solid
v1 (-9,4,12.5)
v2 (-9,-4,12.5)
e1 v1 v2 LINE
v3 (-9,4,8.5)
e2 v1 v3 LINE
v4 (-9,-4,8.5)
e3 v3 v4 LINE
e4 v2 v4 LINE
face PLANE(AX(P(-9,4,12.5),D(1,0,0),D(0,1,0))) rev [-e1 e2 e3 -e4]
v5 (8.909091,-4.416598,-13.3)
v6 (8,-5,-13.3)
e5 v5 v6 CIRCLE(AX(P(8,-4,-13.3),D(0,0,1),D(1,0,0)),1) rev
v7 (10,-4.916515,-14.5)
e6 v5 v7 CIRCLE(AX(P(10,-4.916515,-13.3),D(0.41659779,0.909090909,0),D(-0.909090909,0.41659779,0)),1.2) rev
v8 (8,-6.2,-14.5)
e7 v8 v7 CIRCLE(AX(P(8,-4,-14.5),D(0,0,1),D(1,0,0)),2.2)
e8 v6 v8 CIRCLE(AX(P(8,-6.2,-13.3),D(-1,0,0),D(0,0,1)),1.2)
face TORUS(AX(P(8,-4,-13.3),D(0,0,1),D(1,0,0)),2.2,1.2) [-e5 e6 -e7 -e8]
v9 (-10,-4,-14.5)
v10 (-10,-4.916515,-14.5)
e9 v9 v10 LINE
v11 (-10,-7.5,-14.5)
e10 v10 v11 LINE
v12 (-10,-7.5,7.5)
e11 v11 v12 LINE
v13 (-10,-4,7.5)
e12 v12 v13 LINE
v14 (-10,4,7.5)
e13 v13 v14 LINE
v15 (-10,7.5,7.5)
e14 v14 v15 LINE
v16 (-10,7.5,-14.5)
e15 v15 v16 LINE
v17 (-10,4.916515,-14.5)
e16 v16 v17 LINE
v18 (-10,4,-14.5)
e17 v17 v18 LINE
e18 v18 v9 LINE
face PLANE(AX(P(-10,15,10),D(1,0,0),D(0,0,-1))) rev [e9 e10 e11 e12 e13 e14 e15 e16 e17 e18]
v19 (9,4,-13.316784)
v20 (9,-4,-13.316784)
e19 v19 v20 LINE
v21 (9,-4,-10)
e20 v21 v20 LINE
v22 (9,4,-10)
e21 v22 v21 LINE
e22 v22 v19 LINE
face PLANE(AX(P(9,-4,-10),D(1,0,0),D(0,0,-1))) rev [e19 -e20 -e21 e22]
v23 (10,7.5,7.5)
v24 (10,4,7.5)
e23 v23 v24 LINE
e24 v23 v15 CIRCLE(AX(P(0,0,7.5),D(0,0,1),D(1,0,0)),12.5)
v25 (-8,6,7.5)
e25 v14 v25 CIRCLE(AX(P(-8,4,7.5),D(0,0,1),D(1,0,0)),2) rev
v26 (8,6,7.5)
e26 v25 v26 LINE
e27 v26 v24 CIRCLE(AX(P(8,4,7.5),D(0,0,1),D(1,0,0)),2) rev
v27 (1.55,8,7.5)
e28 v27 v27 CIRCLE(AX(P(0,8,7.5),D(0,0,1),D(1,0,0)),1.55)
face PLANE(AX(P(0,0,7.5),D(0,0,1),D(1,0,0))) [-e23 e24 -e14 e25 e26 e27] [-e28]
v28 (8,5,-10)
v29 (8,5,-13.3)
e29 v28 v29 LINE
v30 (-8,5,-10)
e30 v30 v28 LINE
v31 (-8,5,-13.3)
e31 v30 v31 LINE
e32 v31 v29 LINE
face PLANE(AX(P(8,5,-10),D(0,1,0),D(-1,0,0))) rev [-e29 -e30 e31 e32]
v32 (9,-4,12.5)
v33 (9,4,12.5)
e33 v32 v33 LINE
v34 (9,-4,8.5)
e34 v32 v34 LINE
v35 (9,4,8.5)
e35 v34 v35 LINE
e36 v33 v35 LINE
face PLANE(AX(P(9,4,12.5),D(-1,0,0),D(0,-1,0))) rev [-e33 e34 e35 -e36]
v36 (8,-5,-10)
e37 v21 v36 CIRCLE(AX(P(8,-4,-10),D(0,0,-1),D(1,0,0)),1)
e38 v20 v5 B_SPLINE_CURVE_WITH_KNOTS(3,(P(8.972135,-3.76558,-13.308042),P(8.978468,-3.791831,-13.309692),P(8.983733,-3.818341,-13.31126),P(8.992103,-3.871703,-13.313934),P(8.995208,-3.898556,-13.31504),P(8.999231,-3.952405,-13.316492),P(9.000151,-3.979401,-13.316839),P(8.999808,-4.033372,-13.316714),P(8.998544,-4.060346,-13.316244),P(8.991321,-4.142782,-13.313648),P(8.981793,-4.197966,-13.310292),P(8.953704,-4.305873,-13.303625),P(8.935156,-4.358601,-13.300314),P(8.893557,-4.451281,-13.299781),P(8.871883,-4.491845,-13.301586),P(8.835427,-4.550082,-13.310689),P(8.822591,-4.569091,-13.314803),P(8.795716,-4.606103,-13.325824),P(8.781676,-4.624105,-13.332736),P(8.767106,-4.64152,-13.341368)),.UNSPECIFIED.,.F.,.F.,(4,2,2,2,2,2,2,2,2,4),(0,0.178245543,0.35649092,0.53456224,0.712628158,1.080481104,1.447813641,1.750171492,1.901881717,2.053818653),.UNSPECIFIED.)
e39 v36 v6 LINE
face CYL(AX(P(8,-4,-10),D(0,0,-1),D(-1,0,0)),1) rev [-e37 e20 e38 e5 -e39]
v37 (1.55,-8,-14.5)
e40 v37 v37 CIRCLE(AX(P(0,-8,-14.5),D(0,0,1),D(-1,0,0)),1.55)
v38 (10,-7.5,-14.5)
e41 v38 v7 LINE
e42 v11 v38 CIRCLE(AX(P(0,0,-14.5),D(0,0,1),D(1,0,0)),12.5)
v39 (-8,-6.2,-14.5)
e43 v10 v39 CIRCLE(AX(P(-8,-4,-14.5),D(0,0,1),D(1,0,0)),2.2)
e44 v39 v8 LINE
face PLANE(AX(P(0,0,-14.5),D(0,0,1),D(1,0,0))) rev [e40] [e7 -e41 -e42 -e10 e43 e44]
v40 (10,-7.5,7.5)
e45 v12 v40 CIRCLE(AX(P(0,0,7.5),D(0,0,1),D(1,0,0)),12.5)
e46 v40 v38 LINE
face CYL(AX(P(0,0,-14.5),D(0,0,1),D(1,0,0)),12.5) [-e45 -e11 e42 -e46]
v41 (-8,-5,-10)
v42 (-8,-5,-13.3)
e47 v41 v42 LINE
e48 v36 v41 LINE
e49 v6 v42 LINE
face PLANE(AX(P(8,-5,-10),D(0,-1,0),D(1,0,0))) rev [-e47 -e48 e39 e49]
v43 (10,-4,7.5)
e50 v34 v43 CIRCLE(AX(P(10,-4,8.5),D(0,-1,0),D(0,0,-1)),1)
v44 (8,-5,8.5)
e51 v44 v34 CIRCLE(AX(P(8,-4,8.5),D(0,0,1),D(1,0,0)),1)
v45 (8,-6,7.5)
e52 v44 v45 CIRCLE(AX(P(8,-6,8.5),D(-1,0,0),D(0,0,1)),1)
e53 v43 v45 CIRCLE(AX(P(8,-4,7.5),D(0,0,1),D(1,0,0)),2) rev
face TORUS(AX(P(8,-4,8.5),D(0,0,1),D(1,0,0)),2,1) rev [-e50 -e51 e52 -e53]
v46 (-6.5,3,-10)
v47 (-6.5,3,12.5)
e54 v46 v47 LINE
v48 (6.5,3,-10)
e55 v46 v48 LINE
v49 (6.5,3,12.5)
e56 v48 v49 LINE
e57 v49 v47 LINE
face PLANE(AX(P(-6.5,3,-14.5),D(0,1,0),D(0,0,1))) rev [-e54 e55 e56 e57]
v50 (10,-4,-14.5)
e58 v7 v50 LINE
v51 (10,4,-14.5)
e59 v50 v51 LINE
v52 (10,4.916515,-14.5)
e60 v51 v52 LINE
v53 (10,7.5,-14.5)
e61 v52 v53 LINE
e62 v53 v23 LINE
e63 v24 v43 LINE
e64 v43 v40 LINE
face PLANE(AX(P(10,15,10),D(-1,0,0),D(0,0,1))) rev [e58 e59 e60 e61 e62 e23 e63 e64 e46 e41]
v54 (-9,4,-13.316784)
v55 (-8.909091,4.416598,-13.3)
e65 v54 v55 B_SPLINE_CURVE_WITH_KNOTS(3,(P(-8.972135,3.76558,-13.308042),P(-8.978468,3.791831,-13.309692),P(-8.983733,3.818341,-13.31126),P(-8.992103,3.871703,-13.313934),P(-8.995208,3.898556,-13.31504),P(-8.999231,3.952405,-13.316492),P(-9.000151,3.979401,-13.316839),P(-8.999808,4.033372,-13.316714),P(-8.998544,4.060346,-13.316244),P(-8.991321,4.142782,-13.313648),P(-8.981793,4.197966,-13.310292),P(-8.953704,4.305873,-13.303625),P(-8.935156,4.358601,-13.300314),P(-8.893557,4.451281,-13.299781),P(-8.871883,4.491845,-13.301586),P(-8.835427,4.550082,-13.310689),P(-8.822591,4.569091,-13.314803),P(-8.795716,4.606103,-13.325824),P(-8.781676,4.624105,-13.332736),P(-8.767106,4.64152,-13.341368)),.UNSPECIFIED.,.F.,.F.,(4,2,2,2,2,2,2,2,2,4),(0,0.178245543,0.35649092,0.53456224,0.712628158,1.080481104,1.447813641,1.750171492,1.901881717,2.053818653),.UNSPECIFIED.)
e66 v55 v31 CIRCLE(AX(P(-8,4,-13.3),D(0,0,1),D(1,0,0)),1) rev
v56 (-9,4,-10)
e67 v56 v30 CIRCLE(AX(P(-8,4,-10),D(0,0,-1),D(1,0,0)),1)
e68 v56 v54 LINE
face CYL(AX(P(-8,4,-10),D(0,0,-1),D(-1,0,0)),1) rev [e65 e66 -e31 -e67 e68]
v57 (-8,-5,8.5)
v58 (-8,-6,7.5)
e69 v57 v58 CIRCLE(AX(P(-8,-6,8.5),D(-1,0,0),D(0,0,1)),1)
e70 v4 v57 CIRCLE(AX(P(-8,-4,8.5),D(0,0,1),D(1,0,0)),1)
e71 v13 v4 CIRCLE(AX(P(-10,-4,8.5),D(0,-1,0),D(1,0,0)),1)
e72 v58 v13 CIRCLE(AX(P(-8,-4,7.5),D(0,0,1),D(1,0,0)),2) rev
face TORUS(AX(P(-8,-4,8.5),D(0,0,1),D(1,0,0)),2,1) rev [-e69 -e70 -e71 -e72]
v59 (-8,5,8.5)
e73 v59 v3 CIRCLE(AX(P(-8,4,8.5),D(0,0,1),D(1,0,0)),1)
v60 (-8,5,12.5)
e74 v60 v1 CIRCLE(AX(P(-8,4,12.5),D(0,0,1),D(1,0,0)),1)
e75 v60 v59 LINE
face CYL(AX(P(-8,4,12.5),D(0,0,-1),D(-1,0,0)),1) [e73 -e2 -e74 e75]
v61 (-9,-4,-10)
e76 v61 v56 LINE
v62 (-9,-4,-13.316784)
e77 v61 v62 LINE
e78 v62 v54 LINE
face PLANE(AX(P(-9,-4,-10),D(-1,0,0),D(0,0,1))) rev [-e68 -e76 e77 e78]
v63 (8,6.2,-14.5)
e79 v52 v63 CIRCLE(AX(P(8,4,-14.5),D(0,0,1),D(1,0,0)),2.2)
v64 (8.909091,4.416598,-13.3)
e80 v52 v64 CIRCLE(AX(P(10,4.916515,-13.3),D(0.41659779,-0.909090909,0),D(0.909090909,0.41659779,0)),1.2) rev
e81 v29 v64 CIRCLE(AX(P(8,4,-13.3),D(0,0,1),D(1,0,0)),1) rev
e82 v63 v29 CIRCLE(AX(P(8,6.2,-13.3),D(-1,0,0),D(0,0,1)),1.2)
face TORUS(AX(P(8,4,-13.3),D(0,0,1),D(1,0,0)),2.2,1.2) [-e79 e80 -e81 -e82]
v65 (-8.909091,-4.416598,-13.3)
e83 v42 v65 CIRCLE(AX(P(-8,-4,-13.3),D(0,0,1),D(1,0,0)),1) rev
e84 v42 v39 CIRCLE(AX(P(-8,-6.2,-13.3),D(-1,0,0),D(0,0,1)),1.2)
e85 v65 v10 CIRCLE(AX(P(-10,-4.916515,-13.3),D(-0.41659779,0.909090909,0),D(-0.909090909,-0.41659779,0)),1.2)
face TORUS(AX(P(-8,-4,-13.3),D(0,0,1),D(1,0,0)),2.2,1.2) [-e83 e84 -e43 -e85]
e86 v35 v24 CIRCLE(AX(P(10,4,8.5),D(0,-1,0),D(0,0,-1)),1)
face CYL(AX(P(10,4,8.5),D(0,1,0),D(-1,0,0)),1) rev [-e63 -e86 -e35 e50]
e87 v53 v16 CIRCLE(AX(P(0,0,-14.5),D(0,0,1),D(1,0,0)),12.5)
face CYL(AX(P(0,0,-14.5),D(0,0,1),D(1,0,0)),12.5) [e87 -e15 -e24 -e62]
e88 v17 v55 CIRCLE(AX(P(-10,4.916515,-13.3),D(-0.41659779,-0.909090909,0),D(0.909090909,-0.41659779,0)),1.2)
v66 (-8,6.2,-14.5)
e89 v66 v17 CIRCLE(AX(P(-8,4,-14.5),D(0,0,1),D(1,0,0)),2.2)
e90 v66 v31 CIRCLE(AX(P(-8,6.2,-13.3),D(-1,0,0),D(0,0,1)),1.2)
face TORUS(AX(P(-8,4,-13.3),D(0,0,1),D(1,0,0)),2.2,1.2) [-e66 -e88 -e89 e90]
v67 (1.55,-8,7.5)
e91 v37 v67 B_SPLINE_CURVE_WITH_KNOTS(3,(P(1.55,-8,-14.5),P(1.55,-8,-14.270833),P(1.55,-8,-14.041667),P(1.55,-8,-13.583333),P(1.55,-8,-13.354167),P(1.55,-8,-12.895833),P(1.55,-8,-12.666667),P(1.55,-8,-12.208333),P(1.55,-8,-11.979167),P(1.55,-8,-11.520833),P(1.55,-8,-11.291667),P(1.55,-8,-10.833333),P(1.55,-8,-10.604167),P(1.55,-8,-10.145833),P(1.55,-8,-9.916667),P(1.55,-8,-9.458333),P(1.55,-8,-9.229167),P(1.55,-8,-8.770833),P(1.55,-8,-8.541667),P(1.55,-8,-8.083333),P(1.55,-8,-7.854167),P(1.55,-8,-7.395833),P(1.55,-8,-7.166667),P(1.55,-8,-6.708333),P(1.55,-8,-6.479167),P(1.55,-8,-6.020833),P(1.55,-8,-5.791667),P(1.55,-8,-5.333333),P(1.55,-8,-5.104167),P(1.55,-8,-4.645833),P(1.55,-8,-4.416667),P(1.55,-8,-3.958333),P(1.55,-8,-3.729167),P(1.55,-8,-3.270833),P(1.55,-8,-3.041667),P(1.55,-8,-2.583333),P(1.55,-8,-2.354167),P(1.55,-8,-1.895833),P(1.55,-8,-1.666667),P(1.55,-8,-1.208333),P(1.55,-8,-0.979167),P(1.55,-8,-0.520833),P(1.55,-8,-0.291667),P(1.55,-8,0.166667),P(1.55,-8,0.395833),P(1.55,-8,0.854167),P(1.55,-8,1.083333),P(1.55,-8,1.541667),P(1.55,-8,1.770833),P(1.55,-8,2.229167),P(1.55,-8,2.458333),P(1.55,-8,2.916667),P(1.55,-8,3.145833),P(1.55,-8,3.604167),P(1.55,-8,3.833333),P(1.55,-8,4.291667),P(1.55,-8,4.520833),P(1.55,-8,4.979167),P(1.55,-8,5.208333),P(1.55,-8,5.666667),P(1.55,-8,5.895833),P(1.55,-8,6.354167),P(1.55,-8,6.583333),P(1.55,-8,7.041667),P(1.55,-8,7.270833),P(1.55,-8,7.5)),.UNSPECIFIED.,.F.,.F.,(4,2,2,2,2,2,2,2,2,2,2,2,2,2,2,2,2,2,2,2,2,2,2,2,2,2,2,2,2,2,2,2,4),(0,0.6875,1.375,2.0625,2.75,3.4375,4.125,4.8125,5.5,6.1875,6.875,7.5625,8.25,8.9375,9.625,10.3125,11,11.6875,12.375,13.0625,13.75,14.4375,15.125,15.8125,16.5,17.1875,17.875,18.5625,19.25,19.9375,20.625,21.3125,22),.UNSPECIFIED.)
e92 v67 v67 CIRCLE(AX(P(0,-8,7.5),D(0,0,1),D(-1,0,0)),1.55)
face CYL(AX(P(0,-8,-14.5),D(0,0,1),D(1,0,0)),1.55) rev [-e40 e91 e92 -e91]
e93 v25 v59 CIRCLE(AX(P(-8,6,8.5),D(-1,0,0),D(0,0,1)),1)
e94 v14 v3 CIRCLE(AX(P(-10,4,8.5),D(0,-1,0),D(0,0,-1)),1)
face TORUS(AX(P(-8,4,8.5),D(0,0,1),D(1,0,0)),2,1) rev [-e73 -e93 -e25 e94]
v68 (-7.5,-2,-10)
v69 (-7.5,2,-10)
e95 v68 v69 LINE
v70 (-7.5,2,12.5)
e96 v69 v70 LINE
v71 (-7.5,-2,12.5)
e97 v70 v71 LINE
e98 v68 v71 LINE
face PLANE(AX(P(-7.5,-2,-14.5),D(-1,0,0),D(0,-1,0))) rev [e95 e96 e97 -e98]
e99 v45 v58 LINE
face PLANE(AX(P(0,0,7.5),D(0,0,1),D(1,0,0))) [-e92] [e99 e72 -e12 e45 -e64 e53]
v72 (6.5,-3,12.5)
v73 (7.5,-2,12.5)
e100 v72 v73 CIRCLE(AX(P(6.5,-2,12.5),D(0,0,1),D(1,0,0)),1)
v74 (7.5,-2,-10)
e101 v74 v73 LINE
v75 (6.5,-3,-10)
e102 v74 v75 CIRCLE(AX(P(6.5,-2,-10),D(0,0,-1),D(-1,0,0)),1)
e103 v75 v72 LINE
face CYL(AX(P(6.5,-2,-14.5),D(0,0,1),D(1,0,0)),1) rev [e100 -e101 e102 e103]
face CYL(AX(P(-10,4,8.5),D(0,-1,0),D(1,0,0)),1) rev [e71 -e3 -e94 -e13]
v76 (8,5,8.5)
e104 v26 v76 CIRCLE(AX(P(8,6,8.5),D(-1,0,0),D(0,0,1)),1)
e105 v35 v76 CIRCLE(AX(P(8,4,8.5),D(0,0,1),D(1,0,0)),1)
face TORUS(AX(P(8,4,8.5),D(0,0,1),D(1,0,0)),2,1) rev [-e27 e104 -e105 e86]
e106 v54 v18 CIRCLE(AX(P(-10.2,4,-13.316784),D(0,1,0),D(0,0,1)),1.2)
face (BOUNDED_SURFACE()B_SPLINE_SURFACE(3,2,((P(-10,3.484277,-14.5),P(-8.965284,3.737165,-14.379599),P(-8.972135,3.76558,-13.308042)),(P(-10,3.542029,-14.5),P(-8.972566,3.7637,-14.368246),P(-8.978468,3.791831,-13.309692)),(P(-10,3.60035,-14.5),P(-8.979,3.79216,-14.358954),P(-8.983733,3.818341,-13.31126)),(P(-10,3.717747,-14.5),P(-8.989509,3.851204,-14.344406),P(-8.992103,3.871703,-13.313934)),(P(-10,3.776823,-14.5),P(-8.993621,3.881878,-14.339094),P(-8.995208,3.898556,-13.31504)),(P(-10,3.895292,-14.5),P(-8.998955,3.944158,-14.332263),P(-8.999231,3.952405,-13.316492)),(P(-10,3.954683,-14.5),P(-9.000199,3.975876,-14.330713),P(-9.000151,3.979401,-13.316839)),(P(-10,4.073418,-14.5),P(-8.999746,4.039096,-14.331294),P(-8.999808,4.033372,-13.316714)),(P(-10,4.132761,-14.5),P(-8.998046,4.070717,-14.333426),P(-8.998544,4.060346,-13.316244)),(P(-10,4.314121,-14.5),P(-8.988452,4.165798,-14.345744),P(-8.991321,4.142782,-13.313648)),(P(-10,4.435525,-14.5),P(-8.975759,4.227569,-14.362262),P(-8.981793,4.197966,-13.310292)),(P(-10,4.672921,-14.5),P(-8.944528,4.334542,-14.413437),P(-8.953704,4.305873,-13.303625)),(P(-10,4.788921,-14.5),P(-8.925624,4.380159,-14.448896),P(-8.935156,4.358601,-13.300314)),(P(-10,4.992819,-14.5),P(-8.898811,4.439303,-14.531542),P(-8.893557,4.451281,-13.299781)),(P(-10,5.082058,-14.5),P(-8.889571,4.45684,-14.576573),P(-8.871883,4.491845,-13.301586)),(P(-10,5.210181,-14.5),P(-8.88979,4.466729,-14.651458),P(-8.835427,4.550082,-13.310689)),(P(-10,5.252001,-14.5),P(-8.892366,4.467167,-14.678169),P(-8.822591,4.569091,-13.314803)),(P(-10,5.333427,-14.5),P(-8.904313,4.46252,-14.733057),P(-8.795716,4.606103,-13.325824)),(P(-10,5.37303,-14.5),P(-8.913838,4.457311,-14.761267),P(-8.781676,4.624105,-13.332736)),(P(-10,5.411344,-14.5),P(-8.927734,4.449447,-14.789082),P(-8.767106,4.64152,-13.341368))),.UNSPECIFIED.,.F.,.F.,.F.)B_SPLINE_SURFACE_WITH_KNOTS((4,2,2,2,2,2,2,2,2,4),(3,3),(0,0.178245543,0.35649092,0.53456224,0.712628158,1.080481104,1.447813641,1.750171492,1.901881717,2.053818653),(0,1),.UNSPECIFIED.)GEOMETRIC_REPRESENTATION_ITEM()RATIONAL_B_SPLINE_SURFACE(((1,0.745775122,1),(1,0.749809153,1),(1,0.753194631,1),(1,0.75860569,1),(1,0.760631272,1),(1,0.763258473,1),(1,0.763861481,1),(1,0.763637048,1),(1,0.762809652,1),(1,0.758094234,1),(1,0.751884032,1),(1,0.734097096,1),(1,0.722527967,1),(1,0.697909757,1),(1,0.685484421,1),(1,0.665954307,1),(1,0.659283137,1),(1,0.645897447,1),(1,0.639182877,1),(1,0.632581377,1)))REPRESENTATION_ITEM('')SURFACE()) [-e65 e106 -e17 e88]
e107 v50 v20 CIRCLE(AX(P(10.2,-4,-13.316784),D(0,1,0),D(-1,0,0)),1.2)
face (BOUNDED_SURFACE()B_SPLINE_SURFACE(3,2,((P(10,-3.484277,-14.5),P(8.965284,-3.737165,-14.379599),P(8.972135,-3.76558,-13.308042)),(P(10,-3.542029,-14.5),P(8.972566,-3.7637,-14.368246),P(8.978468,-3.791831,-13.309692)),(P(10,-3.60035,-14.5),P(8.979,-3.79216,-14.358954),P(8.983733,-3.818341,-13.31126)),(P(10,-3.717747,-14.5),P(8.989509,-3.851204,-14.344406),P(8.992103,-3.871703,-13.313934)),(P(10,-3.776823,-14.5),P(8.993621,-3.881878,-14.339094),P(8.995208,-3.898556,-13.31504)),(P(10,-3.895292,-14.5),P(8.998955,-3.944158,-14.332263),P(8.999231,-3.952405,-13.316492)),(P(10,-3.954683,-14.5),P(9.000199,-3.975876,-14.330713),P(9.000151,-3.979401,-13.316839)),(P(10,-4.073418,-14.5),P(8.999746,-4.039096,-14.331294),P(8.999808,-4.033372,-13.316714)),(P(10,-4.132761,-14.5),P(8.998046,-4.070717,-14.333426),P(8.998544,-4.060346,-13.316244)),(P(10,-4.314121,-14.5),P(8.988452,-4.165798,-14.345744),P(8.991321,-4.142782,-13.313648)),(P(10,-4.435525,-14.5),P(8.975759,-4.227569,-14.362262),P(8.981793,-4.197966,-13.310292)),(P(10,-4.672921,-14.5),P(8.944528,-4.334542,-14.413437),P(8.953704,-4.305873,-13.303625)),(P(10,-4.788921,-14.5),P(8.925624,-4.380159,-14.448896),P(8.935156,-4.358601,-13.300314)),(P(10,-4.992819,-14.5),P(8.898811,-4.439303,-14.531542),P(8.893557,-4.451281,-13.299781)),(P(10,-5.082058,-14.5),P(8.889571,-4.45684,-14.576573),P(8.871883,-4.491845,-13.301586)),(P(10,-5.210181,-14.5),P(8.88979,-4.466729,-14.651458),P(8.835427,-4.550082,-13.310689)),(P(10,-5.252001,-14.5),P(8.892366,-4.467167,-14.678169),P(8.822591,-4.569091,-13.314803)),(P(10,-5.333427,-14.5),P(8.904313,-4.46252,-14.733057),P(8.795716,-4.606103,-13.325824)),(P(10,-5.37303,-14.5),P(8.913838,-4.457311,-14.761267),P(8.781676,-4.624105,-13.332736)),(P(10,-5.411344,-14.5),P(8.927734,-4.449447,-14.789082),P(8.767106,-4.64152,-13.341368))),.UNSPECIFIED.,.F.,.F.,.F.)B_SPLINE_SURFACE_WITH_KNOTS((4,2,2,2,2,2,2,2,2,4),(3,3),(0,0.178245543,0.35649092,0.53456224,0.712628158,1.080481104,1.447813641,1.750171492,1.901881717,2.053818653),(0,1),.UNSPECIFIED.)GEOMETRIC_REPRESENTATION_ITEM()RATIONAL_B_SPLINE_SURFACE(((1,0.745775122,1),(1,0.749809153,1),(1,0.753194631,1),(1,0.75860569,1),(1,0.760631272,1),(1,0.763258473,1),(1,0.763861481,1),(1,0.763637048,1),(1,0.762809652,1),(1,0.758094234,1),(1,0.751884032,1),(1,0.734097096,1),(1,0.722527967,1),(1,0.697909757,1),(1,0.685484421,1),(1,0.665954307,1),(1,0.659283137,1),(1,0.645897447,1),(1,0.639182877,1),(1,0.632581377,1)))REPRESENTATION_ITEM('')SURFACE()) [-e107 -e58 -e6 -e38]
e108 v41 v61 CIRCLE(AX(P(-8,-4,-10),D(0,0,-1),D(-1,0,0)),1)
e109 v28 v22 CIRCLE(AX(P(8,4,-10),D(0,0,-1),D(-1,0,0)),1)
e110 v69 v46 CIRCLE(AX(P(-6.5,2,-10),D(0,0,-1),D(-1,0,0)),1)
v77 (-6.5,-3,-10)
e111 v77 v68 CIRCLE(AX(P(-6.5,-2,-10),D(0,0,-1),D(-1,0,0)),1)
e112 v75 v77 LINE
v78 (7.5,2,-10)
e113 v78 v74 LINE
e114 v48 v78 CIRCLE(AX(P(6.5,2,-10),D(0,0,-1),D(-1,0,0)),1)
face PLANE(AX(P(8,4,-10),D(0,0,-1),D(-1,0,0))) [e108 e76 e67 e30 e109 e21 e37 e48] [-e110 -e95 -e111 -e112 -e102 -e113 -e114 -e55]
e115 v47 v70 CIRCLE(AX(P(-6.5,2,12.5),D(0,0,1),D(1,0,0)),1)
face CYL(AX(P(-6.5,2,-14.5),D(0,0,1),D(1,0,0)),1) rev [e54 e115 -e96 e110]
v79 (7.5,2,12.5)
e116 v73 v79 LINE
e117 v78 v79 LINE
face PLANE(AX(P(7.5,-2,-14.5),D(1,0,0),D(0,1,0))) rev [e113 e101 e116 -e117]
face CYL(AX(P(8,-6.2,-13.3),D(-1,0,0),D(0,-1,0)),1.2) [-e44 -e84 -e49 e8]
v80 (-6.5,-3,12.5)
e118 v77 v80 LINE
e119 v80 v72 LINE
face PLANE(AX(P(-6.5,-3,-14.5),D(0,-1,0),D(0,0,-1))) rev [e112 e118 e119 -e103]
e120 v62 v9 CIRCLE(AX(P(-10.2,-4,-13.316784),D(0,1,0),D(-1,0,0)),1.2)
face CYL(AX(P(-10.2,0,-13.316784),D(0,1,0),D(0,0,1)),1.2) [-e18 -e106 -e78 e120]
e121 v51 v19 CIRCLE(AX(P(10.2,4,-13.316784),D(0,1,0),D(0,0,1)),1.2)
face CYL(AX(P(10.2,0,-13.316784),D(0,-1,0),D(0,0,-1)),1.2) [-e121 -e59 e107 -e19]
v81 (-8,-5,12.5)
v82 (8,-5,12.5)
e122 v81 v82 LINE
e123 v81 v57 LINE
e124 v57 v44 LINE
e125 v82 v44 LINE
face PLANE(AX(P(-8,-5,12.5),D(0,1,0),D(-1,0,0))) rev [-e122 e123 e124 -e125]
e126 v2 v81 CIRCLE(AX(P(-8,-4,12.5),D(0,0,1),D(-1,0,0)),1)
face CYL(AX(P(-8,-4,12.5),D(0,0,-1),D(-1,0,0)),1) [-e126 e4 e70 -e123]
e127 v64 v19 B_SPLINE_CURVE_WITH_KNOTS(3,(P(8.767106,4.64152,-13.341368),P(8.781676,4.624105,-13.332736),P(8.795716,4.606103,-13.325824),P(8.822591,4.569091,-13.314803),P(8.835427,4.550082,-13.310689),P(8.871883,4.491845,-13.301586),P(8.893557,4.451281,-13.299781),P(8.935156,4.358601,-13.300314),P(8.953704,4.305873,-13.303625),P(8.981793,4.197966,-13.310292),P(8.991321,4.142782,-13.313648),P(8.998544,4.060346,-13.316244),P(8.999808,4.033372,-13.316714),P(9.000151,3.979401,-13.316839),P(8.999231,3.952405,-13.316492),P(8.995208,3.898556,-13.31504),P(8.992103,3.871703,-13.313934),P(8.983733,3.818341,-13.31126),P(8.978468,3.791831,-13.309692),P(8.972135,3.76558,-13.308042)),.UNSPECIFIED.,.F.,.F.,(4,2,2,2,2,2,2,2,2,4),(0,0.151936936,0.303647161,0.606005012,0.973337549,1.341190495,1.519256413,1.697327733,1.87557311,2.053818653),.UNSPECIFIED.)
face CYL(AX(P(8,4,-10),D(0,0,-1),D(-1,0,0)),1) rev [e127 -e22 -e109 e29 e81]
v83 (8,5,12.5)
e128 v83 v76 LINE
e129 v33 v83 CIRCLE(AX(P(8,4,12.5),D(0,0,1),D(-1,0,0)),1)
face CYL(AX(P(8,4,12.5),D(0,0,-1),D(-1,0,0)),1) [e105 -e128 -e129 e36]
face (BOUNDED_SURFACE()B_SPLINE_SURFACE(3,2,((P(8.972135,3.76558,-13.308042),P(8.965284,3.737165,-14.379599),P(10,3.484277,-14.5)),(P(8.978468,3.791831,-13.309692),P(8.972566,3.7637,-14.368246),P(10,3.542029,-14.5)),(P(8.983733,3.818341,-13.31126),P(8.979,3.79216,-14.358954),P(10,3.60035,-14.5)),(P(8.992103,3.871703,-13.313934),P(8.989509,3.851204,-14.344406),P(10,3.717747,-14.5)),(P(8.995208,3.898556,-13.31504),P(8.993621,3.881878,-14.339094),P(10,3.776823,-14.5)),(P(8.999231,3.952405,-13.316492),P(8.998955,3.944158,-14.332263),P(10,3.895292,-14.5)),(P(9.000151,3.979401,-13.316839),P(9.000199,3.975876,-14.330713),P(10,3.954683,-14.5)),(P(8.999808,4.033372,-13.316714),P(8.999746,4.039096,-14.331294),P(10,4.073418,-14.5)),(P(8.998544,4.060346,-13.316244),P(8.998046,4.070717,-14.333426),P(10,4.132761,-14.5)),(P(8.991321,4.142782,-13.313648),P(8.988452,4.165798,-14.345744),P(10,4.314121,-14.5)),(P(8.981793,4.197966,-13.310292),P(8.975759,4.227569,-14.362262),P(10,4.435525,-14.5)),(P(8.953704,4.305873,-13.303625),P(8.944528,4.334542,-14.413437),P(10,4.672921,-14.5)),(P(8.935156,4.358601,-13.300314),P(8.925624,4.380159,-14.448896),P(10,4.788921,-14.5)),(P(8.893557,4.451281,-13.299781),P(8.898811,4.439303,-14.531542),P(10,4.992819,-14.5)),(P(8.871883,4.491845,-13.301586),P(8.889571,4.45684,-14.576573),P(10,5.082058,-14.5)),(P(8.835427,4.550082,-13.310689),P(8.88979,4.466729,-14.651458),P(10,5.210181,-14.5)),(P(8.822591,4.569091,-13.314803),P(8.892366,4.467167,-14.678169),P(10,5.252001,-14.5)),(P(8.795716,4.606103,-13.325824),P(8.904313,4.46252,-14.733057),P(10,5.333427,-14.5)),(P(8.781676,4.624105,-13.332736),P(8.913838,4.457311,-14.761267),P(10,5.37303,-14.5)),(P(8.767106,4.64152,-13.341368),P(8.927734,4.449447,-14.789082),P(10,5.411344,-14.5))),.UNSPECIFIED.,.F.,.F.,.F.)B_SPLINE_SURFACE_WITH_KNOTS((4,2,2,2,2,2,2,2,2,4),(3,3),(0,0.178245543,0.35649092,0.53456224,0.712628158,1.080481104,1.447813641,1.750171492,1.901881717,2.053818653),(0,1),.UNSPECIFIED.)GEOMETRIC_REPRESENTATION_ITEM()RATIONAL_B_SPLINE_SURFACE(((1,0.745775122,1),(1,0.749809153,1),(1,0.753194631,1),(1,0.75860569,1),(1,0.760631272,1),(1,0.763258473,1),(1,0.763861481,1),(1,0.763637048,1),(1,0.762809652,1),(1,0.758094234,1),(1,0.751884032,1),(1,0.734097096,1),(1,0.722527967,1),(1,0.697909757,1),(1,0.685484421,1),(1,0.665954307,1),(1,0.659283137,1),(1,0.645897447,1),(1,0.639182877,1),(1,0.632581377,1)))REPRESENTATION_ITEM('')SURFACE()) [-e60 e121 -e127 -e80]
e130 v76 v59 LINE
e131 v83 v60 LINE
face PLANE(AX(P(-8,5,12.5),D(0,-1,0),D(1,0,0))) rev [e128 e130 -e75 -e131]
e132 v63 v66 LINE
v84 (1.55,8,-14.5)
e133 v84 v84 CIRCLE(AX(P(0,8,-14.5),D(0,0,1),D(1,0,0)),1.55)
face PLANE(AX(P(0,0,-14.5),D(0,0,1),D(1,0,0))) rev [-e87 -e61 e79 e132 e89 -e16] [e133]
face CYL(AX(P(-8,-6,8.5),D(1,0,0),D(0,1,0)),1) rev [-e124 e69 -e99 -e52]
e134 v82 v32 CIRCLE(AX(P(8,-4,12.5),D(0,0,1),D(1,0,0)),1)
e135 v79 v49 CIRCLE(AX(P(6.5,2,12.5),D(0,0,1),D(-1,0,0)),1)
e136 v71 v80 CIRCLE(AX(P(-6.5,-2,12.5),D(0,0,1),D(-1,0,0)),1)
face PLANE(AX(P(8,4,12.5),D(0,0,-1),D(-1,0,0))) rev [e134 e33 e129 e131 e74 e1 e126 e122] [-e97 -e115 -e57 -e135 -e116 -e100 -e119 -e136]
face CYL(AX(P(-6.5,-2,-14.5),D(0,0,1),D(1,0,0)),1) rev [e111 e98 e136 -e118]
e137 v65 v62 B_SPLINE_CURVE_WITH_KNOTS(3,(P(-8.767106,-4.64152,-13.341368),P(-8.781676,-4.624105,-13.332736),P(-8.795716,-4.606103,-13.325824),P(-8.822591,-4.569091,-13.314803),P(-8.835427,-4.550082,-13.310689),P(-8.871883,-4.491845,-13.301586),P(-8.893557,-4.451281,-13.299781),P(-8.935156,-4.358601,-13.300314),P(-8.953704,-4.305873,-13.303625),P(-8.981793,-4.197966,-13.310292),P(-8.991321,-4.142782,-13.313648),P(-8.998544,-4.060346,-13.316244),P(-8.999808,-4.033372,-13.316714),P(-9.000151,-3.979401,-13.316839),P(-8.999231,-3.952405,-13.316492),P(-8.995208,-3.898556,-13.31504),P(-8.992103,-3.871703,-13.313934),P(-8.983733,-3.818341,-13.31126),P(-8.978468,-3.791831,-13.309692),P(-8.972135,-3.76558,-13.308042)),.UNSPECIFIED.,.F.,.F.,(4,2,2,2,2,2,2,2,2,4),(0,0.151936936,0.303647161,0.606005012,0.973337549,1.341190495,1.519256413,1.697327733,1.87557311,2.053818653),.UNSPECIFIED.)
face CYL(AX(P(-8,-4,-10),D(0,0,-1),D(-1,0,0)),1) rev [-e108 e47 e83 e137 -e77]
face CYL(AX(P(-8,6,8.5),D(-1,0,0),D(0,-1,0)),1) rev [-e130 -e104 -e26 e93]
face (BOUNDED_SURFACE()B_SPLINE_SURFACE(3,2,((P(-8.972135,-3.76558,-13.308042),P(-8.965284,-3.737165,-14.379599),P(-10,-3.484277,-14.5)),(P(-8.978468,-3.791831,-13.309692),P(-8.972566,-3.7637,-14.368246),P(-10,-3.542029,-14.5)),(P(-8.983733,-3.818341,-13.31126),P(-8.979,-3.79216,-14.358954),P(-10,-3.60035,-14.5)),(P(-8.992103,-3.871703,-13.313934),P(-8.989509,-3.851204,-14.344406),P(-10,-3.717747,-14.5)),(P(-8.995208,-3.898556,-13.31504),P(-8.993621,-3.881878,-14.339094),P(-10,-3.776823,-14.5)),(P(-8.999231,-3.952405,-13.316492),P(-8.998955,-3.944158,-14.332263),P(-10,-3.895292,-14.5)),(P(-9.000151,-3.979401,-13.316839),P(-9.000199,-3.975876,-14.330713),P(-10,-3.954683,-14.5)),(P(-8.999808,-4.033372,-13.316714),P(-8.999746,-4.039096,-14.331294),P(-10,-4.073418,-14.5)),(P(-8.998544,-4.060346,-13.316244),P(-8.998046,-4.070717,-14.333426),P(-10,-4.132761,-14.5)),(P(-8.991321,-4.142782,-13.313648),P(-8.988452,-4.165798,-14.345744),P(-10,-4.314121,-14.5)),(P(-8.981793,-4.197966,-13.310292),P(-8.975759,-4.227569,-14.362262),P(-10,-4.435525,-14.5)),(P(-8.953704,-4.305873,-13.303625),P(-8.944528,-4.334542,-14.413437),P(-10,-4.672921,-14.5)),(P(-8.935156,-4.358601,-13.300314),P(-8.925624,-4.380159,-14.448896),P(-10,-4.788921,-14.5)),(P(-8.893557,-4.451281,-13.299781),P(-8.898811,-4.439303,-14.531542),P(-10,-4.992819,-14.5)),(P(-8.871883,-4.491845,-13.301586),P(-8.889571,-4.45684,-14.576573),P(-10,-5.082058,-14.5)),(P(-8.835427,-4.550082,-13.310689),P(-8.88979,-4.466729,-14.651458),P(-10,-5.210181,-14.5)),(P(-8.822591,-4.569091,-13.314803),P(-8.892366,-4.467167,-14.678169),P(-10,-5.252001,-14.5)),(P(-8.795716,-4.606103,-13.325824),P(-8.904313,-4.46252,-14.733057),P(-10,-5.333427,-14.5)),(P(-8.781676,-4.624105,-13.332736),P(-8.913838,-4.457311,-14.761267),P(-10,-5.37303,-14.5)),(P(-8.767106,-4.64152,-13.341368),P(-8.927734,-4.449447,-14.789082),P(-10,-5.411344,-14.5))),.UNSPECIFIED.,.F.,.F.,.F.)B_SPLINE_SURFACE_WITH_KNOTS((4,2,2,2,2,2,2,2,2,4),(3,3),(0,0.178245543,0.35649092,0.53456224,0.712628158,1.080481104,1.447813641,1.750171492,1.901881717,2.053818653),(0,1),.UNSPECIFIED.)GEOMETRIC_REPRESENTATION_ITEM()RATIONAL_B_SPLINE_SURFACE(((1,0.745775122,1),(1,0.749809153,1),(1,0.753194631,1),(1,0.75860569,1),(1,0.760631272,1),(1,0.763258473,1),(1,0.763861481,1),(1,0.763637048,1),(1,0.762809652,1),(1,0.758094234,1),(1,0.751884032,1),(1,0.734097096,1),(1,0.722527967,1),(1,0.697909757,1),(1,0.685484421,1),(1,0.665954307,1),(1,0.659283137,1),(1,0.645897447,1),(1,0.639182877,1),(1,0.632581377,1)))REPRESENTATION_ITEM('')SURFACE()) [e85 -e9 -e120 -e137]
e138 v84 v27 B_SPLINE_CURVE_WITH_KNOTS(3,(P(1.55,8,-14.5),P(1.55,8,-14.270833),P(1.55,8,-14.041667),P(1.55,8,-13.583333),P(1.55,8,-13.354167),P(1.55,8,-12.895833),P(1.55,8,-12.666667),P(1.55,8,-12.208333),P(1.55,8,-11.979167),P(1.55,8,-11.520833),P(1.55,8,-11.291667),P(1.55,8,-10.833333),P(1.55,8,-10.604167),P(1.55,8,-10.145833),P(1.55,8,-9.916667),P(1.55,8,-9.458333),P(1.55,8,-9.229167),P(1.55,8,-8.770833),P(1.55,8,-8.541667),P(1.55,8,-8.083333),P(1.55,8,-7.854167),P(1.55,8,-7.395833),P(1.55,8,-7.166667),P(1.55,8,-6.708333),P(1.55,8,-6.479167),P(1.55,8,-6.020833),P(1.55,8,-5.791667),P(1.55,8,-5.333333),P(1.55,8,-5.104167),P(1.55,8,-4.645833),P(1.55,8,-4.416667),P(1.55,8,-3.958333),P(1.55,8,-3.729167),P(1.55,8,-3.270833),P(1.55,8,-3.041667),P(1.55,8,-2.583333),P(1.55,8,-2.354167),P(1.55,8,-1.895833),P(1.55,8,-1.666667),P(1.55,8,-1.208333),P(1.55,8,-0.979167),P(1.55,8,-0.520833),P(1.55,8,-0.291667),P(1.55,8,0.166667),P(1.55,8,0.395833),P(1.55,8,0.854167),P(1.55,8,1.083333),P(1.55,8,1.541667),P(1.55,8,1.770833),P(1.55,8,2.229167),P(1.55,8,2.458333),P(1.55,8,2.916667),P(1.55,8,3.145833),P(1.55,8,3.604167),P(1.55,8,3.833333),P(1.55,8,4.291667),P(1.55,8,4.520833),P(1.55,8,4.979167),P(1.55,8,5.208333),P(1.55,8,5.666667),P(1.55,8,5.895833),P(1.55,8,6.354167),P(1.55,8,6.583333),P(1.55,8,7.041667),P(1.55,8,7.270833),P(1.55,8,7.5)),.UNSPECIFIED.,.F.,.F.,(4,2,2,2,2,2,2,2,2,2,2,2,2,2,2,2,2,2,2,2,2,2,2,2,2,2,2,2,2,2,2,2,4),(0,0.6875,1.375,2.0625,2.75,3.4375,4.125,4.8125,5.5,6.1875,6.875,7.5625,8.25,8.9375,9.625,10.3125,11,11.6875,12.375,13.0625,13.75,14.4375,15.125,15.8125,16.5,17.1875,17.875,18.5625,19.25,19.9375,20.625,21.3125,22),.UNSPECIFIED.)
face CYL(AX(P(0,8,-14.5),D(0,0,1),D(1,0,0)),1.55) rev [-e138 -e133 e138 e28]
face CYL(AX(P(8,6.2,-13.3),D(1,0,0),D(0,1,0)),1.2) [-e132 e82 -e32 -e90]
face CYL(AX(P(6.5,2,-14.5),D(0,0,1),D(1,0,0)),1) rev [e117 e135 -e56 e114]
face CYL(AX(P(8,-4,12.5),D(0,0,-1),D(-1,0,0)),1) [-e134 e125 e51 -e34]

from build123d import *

# Parameters (mm, degrees)
AUFSATZ_LINEAR_AUSTRAGEN1_DEPTH      = 7.5
AUFSATZ_LINEAR_AUSTRAGEN1_DEPTH_BACK = 14.5
SKIZZE1_R                            = 12.5
SKIZZE1_R_2                          = 1.55
SCHNITT_LINEAR_AUSTRAGEN1_DEPTH      = 4.5
AUFSATZ_LINEAR_AUSTRAGEN2_DEPTH      = 5
SCHNITT_LINEAR_AUSTRAGEN4_DEPTH      = 23.86372673
SCHNITT_LINEAR_AUSTRAGEN4_DEPTH_BACK = 23.86372673
SCHNITT_LINEAR_AUSTRAGEN5_DEPTH      = 10
SCHNITT_LINEAR_AUSTRAGEN5_DEPTH_BACK = 23.86372673
SKIZZE5_OUTSIDE_W                    = 35.898
SKIZZE5_OUTSIDE_H                    = 35.898
SKIZZE5_OUTSIDE_W_2                  = 20
SKIZZE5_OUTSIDE_H_2                  = 30
VERRUNDUNG1_R                        = 1.2
VERRUNDUNG2_R                        = 1


with BuildPart() as part:
    # Skizze1 → Aufsatz-Linear austragen1 (new, two sides: drawn at the far end of the back side and taken through both)
    with BuildSketch(Plane.XY.offset(-AUFSATZ_LINEAR_AUSTRAGEN1_DEPTH_BACK)):
        Circle(SKIZZE1_R)
        with Locations((0, 8)):
            Circle(SKIZZE1_R_2, mode=Mode.SUBTRACT)
        with Locations((0, -8)):
            Circle(SKIZZE1_R_2, mode=Mode.SUBTRACT)
    extrude(amount=AUFSATZ_LINEAR_AUSTRAGEN1_DEPTH + AUFSATZ_LINEAR_AUSTRAGEN1_DEPTH_BACK)

    # Skizze2 → Schnitt-Linear austragen1 (cut)
    with BuildSketch(Plane(origin=(0, 0, -14.5), x_dir=(-1, 0, 0), z_dir=(0, 0, -1))):
        with BuildLine():
            Line((-9, -4), (-9, 4))
            ThreePointArc((-9, 4), (-8.707106781, 4.707106781), (-8, 5))
            Line((-8, 5), (8, 5))
            ThreePointArc((8, 5), (8.707106781, 4.707106781), (9, 4))
            Line((9, 4), (9, -4))
            ThreePointArc((9, -4), (8.707106781, -4.707106781), (8, -5))
            Line((8, -5), (-8, -5))
            ThreePointArc((-8, -5), (-8.707106781, -4.707106781), (-9, -4))
        make_face()
    extrude(amount=-SCHNITT_LINEAR_AUSTRAGEN1_DEPTH, mode=Mode.SUBTRACT)

    # Skizze3 → Aufsatz-Linear austragen2 (add)
    with BuildSketch(Plane.XY.offset(7.5)):
        with BuildLine():
            Line((-8, 5), (8, 5))
            ThreePointArc((8, 5), (8.707106781, 4.707106781), (9, 4))
            Line((9, 4), (9, -4))
            ThreePointArc((9, -4), (8.707106781, -4.707106781), (8, -5))
            Line((8, -5), (-8, -5))
            ThreePointArc((-8, -5), (-8.707106781, -4.707106781), (-9, -4))
            Line((-9, -4), (-9, 4))
            ThreePointArc((-9, 4), (-8.707106781, 4.707106781), (-8, 5))
        make_face()
    extrude(amount=AUFSATZ_LINEAR_AUSTRAGEN2_DEPTH)

    # Skizze4 → Schnitt-Linear austragen4 (cut, two sides: drawn at the far end of the back side and taken through both)
    with BuildSketch(Plane.XY.offset(-SCHNITT_LINEAR_AUSTRAGEN4_DEPTH_BACK)):
        with BuildLine():
            Line((-6.5, -3), (6.5, -3))
            ThreePointArc((6.5, -3), (7.207106781, -2.707106781), (7.5, -2))
            Line((7.5, -2), (7.5, 2))
            ThreePointArc((7.5, 2), (7.207106781, 2.707106781), (6.5, 3))
            Line((6.5, 3), (-6.5, 3))
            ThreePointArc((-6.5, 3), (-7.207106781, 2.707106781), (-7.5, 2))
            Line((-7.5, 2), (-7.5, -2))
            ThreePointArc((-7.5, -2), (-7.207106781, -2.707106781), (-6.5, -3))
        make_face()
    extrude(amount=SCHNITT_LINEAR_AUSTRAGEN4_DEPTH + SCHNITT_LINEAR_AUSTRAGEN4_DEPTH_BACK, mode=Mode.SUBTRACT)

    # Skizze5 outside → Schnitt-Linear austragen5 (cut, two sides: drawn at the far end of the back side and taken through both)
    with BuildSketch(Plane.XY.offset(-SCHNITT_LINEAR_AUSTRAGEN5_DEPTH_BACK)):
        Rectangle(SKIZZE5_OUTSIDE_W, SKIZZE5_OUTSIDE_H)
        Rectangle(SKIZZE5_OUTSIDE_W_2, SKIZZE5_OUTSIDE_H_2, mode=Mode.SUBTRACT)
    extrude(amount=SCHNITT_LINEAR_AUSTRAGEN5_DEPTH + SCHNITT_LINEAR_AUSTRAGEN5_DEPTH_BACK, mode=Mode.SUBTRACT)

    # Verrundung1
    verrundung1_edges = [part.edges().sort_by_distance(p)[0] for p in [
        (-8.707106781, 4.707106781, -14.5),
        (-8.707106781, -4.707106781, -14.5),
        (0, -5, -14.5),
        (8.707106781, -4.707106781, -14.5),
        (8.707106781, 4.707106781, -14.5),
        (0, 5, -14.5),
    ]]
    fillet(verrundung1_edges, radius=VERRUNDUNG1_R)

    # Verrundung2
    verrundung2_edges = [part.edges().sort_by_distance(p)[0] for p in [
        (8.707106781, 4.707106781, 7.5),
        (0, 5, 7.5),
        (-8.707106781, 4.707106781, 7.5),
        (-9, 0, 7.5),
        (-8.707106781, -4.707106781, 7.5),
        (0, -5, 7.5),
        (8.707106781, -4.707106781, 7.5),
        (9, 0, 7.5),
    ]]
    fillet(verrundung2_edges, radius=VERRUNDUNG2_R - 0.0001)  # a hair under: the kernel refuses the full size


solid = part.part
